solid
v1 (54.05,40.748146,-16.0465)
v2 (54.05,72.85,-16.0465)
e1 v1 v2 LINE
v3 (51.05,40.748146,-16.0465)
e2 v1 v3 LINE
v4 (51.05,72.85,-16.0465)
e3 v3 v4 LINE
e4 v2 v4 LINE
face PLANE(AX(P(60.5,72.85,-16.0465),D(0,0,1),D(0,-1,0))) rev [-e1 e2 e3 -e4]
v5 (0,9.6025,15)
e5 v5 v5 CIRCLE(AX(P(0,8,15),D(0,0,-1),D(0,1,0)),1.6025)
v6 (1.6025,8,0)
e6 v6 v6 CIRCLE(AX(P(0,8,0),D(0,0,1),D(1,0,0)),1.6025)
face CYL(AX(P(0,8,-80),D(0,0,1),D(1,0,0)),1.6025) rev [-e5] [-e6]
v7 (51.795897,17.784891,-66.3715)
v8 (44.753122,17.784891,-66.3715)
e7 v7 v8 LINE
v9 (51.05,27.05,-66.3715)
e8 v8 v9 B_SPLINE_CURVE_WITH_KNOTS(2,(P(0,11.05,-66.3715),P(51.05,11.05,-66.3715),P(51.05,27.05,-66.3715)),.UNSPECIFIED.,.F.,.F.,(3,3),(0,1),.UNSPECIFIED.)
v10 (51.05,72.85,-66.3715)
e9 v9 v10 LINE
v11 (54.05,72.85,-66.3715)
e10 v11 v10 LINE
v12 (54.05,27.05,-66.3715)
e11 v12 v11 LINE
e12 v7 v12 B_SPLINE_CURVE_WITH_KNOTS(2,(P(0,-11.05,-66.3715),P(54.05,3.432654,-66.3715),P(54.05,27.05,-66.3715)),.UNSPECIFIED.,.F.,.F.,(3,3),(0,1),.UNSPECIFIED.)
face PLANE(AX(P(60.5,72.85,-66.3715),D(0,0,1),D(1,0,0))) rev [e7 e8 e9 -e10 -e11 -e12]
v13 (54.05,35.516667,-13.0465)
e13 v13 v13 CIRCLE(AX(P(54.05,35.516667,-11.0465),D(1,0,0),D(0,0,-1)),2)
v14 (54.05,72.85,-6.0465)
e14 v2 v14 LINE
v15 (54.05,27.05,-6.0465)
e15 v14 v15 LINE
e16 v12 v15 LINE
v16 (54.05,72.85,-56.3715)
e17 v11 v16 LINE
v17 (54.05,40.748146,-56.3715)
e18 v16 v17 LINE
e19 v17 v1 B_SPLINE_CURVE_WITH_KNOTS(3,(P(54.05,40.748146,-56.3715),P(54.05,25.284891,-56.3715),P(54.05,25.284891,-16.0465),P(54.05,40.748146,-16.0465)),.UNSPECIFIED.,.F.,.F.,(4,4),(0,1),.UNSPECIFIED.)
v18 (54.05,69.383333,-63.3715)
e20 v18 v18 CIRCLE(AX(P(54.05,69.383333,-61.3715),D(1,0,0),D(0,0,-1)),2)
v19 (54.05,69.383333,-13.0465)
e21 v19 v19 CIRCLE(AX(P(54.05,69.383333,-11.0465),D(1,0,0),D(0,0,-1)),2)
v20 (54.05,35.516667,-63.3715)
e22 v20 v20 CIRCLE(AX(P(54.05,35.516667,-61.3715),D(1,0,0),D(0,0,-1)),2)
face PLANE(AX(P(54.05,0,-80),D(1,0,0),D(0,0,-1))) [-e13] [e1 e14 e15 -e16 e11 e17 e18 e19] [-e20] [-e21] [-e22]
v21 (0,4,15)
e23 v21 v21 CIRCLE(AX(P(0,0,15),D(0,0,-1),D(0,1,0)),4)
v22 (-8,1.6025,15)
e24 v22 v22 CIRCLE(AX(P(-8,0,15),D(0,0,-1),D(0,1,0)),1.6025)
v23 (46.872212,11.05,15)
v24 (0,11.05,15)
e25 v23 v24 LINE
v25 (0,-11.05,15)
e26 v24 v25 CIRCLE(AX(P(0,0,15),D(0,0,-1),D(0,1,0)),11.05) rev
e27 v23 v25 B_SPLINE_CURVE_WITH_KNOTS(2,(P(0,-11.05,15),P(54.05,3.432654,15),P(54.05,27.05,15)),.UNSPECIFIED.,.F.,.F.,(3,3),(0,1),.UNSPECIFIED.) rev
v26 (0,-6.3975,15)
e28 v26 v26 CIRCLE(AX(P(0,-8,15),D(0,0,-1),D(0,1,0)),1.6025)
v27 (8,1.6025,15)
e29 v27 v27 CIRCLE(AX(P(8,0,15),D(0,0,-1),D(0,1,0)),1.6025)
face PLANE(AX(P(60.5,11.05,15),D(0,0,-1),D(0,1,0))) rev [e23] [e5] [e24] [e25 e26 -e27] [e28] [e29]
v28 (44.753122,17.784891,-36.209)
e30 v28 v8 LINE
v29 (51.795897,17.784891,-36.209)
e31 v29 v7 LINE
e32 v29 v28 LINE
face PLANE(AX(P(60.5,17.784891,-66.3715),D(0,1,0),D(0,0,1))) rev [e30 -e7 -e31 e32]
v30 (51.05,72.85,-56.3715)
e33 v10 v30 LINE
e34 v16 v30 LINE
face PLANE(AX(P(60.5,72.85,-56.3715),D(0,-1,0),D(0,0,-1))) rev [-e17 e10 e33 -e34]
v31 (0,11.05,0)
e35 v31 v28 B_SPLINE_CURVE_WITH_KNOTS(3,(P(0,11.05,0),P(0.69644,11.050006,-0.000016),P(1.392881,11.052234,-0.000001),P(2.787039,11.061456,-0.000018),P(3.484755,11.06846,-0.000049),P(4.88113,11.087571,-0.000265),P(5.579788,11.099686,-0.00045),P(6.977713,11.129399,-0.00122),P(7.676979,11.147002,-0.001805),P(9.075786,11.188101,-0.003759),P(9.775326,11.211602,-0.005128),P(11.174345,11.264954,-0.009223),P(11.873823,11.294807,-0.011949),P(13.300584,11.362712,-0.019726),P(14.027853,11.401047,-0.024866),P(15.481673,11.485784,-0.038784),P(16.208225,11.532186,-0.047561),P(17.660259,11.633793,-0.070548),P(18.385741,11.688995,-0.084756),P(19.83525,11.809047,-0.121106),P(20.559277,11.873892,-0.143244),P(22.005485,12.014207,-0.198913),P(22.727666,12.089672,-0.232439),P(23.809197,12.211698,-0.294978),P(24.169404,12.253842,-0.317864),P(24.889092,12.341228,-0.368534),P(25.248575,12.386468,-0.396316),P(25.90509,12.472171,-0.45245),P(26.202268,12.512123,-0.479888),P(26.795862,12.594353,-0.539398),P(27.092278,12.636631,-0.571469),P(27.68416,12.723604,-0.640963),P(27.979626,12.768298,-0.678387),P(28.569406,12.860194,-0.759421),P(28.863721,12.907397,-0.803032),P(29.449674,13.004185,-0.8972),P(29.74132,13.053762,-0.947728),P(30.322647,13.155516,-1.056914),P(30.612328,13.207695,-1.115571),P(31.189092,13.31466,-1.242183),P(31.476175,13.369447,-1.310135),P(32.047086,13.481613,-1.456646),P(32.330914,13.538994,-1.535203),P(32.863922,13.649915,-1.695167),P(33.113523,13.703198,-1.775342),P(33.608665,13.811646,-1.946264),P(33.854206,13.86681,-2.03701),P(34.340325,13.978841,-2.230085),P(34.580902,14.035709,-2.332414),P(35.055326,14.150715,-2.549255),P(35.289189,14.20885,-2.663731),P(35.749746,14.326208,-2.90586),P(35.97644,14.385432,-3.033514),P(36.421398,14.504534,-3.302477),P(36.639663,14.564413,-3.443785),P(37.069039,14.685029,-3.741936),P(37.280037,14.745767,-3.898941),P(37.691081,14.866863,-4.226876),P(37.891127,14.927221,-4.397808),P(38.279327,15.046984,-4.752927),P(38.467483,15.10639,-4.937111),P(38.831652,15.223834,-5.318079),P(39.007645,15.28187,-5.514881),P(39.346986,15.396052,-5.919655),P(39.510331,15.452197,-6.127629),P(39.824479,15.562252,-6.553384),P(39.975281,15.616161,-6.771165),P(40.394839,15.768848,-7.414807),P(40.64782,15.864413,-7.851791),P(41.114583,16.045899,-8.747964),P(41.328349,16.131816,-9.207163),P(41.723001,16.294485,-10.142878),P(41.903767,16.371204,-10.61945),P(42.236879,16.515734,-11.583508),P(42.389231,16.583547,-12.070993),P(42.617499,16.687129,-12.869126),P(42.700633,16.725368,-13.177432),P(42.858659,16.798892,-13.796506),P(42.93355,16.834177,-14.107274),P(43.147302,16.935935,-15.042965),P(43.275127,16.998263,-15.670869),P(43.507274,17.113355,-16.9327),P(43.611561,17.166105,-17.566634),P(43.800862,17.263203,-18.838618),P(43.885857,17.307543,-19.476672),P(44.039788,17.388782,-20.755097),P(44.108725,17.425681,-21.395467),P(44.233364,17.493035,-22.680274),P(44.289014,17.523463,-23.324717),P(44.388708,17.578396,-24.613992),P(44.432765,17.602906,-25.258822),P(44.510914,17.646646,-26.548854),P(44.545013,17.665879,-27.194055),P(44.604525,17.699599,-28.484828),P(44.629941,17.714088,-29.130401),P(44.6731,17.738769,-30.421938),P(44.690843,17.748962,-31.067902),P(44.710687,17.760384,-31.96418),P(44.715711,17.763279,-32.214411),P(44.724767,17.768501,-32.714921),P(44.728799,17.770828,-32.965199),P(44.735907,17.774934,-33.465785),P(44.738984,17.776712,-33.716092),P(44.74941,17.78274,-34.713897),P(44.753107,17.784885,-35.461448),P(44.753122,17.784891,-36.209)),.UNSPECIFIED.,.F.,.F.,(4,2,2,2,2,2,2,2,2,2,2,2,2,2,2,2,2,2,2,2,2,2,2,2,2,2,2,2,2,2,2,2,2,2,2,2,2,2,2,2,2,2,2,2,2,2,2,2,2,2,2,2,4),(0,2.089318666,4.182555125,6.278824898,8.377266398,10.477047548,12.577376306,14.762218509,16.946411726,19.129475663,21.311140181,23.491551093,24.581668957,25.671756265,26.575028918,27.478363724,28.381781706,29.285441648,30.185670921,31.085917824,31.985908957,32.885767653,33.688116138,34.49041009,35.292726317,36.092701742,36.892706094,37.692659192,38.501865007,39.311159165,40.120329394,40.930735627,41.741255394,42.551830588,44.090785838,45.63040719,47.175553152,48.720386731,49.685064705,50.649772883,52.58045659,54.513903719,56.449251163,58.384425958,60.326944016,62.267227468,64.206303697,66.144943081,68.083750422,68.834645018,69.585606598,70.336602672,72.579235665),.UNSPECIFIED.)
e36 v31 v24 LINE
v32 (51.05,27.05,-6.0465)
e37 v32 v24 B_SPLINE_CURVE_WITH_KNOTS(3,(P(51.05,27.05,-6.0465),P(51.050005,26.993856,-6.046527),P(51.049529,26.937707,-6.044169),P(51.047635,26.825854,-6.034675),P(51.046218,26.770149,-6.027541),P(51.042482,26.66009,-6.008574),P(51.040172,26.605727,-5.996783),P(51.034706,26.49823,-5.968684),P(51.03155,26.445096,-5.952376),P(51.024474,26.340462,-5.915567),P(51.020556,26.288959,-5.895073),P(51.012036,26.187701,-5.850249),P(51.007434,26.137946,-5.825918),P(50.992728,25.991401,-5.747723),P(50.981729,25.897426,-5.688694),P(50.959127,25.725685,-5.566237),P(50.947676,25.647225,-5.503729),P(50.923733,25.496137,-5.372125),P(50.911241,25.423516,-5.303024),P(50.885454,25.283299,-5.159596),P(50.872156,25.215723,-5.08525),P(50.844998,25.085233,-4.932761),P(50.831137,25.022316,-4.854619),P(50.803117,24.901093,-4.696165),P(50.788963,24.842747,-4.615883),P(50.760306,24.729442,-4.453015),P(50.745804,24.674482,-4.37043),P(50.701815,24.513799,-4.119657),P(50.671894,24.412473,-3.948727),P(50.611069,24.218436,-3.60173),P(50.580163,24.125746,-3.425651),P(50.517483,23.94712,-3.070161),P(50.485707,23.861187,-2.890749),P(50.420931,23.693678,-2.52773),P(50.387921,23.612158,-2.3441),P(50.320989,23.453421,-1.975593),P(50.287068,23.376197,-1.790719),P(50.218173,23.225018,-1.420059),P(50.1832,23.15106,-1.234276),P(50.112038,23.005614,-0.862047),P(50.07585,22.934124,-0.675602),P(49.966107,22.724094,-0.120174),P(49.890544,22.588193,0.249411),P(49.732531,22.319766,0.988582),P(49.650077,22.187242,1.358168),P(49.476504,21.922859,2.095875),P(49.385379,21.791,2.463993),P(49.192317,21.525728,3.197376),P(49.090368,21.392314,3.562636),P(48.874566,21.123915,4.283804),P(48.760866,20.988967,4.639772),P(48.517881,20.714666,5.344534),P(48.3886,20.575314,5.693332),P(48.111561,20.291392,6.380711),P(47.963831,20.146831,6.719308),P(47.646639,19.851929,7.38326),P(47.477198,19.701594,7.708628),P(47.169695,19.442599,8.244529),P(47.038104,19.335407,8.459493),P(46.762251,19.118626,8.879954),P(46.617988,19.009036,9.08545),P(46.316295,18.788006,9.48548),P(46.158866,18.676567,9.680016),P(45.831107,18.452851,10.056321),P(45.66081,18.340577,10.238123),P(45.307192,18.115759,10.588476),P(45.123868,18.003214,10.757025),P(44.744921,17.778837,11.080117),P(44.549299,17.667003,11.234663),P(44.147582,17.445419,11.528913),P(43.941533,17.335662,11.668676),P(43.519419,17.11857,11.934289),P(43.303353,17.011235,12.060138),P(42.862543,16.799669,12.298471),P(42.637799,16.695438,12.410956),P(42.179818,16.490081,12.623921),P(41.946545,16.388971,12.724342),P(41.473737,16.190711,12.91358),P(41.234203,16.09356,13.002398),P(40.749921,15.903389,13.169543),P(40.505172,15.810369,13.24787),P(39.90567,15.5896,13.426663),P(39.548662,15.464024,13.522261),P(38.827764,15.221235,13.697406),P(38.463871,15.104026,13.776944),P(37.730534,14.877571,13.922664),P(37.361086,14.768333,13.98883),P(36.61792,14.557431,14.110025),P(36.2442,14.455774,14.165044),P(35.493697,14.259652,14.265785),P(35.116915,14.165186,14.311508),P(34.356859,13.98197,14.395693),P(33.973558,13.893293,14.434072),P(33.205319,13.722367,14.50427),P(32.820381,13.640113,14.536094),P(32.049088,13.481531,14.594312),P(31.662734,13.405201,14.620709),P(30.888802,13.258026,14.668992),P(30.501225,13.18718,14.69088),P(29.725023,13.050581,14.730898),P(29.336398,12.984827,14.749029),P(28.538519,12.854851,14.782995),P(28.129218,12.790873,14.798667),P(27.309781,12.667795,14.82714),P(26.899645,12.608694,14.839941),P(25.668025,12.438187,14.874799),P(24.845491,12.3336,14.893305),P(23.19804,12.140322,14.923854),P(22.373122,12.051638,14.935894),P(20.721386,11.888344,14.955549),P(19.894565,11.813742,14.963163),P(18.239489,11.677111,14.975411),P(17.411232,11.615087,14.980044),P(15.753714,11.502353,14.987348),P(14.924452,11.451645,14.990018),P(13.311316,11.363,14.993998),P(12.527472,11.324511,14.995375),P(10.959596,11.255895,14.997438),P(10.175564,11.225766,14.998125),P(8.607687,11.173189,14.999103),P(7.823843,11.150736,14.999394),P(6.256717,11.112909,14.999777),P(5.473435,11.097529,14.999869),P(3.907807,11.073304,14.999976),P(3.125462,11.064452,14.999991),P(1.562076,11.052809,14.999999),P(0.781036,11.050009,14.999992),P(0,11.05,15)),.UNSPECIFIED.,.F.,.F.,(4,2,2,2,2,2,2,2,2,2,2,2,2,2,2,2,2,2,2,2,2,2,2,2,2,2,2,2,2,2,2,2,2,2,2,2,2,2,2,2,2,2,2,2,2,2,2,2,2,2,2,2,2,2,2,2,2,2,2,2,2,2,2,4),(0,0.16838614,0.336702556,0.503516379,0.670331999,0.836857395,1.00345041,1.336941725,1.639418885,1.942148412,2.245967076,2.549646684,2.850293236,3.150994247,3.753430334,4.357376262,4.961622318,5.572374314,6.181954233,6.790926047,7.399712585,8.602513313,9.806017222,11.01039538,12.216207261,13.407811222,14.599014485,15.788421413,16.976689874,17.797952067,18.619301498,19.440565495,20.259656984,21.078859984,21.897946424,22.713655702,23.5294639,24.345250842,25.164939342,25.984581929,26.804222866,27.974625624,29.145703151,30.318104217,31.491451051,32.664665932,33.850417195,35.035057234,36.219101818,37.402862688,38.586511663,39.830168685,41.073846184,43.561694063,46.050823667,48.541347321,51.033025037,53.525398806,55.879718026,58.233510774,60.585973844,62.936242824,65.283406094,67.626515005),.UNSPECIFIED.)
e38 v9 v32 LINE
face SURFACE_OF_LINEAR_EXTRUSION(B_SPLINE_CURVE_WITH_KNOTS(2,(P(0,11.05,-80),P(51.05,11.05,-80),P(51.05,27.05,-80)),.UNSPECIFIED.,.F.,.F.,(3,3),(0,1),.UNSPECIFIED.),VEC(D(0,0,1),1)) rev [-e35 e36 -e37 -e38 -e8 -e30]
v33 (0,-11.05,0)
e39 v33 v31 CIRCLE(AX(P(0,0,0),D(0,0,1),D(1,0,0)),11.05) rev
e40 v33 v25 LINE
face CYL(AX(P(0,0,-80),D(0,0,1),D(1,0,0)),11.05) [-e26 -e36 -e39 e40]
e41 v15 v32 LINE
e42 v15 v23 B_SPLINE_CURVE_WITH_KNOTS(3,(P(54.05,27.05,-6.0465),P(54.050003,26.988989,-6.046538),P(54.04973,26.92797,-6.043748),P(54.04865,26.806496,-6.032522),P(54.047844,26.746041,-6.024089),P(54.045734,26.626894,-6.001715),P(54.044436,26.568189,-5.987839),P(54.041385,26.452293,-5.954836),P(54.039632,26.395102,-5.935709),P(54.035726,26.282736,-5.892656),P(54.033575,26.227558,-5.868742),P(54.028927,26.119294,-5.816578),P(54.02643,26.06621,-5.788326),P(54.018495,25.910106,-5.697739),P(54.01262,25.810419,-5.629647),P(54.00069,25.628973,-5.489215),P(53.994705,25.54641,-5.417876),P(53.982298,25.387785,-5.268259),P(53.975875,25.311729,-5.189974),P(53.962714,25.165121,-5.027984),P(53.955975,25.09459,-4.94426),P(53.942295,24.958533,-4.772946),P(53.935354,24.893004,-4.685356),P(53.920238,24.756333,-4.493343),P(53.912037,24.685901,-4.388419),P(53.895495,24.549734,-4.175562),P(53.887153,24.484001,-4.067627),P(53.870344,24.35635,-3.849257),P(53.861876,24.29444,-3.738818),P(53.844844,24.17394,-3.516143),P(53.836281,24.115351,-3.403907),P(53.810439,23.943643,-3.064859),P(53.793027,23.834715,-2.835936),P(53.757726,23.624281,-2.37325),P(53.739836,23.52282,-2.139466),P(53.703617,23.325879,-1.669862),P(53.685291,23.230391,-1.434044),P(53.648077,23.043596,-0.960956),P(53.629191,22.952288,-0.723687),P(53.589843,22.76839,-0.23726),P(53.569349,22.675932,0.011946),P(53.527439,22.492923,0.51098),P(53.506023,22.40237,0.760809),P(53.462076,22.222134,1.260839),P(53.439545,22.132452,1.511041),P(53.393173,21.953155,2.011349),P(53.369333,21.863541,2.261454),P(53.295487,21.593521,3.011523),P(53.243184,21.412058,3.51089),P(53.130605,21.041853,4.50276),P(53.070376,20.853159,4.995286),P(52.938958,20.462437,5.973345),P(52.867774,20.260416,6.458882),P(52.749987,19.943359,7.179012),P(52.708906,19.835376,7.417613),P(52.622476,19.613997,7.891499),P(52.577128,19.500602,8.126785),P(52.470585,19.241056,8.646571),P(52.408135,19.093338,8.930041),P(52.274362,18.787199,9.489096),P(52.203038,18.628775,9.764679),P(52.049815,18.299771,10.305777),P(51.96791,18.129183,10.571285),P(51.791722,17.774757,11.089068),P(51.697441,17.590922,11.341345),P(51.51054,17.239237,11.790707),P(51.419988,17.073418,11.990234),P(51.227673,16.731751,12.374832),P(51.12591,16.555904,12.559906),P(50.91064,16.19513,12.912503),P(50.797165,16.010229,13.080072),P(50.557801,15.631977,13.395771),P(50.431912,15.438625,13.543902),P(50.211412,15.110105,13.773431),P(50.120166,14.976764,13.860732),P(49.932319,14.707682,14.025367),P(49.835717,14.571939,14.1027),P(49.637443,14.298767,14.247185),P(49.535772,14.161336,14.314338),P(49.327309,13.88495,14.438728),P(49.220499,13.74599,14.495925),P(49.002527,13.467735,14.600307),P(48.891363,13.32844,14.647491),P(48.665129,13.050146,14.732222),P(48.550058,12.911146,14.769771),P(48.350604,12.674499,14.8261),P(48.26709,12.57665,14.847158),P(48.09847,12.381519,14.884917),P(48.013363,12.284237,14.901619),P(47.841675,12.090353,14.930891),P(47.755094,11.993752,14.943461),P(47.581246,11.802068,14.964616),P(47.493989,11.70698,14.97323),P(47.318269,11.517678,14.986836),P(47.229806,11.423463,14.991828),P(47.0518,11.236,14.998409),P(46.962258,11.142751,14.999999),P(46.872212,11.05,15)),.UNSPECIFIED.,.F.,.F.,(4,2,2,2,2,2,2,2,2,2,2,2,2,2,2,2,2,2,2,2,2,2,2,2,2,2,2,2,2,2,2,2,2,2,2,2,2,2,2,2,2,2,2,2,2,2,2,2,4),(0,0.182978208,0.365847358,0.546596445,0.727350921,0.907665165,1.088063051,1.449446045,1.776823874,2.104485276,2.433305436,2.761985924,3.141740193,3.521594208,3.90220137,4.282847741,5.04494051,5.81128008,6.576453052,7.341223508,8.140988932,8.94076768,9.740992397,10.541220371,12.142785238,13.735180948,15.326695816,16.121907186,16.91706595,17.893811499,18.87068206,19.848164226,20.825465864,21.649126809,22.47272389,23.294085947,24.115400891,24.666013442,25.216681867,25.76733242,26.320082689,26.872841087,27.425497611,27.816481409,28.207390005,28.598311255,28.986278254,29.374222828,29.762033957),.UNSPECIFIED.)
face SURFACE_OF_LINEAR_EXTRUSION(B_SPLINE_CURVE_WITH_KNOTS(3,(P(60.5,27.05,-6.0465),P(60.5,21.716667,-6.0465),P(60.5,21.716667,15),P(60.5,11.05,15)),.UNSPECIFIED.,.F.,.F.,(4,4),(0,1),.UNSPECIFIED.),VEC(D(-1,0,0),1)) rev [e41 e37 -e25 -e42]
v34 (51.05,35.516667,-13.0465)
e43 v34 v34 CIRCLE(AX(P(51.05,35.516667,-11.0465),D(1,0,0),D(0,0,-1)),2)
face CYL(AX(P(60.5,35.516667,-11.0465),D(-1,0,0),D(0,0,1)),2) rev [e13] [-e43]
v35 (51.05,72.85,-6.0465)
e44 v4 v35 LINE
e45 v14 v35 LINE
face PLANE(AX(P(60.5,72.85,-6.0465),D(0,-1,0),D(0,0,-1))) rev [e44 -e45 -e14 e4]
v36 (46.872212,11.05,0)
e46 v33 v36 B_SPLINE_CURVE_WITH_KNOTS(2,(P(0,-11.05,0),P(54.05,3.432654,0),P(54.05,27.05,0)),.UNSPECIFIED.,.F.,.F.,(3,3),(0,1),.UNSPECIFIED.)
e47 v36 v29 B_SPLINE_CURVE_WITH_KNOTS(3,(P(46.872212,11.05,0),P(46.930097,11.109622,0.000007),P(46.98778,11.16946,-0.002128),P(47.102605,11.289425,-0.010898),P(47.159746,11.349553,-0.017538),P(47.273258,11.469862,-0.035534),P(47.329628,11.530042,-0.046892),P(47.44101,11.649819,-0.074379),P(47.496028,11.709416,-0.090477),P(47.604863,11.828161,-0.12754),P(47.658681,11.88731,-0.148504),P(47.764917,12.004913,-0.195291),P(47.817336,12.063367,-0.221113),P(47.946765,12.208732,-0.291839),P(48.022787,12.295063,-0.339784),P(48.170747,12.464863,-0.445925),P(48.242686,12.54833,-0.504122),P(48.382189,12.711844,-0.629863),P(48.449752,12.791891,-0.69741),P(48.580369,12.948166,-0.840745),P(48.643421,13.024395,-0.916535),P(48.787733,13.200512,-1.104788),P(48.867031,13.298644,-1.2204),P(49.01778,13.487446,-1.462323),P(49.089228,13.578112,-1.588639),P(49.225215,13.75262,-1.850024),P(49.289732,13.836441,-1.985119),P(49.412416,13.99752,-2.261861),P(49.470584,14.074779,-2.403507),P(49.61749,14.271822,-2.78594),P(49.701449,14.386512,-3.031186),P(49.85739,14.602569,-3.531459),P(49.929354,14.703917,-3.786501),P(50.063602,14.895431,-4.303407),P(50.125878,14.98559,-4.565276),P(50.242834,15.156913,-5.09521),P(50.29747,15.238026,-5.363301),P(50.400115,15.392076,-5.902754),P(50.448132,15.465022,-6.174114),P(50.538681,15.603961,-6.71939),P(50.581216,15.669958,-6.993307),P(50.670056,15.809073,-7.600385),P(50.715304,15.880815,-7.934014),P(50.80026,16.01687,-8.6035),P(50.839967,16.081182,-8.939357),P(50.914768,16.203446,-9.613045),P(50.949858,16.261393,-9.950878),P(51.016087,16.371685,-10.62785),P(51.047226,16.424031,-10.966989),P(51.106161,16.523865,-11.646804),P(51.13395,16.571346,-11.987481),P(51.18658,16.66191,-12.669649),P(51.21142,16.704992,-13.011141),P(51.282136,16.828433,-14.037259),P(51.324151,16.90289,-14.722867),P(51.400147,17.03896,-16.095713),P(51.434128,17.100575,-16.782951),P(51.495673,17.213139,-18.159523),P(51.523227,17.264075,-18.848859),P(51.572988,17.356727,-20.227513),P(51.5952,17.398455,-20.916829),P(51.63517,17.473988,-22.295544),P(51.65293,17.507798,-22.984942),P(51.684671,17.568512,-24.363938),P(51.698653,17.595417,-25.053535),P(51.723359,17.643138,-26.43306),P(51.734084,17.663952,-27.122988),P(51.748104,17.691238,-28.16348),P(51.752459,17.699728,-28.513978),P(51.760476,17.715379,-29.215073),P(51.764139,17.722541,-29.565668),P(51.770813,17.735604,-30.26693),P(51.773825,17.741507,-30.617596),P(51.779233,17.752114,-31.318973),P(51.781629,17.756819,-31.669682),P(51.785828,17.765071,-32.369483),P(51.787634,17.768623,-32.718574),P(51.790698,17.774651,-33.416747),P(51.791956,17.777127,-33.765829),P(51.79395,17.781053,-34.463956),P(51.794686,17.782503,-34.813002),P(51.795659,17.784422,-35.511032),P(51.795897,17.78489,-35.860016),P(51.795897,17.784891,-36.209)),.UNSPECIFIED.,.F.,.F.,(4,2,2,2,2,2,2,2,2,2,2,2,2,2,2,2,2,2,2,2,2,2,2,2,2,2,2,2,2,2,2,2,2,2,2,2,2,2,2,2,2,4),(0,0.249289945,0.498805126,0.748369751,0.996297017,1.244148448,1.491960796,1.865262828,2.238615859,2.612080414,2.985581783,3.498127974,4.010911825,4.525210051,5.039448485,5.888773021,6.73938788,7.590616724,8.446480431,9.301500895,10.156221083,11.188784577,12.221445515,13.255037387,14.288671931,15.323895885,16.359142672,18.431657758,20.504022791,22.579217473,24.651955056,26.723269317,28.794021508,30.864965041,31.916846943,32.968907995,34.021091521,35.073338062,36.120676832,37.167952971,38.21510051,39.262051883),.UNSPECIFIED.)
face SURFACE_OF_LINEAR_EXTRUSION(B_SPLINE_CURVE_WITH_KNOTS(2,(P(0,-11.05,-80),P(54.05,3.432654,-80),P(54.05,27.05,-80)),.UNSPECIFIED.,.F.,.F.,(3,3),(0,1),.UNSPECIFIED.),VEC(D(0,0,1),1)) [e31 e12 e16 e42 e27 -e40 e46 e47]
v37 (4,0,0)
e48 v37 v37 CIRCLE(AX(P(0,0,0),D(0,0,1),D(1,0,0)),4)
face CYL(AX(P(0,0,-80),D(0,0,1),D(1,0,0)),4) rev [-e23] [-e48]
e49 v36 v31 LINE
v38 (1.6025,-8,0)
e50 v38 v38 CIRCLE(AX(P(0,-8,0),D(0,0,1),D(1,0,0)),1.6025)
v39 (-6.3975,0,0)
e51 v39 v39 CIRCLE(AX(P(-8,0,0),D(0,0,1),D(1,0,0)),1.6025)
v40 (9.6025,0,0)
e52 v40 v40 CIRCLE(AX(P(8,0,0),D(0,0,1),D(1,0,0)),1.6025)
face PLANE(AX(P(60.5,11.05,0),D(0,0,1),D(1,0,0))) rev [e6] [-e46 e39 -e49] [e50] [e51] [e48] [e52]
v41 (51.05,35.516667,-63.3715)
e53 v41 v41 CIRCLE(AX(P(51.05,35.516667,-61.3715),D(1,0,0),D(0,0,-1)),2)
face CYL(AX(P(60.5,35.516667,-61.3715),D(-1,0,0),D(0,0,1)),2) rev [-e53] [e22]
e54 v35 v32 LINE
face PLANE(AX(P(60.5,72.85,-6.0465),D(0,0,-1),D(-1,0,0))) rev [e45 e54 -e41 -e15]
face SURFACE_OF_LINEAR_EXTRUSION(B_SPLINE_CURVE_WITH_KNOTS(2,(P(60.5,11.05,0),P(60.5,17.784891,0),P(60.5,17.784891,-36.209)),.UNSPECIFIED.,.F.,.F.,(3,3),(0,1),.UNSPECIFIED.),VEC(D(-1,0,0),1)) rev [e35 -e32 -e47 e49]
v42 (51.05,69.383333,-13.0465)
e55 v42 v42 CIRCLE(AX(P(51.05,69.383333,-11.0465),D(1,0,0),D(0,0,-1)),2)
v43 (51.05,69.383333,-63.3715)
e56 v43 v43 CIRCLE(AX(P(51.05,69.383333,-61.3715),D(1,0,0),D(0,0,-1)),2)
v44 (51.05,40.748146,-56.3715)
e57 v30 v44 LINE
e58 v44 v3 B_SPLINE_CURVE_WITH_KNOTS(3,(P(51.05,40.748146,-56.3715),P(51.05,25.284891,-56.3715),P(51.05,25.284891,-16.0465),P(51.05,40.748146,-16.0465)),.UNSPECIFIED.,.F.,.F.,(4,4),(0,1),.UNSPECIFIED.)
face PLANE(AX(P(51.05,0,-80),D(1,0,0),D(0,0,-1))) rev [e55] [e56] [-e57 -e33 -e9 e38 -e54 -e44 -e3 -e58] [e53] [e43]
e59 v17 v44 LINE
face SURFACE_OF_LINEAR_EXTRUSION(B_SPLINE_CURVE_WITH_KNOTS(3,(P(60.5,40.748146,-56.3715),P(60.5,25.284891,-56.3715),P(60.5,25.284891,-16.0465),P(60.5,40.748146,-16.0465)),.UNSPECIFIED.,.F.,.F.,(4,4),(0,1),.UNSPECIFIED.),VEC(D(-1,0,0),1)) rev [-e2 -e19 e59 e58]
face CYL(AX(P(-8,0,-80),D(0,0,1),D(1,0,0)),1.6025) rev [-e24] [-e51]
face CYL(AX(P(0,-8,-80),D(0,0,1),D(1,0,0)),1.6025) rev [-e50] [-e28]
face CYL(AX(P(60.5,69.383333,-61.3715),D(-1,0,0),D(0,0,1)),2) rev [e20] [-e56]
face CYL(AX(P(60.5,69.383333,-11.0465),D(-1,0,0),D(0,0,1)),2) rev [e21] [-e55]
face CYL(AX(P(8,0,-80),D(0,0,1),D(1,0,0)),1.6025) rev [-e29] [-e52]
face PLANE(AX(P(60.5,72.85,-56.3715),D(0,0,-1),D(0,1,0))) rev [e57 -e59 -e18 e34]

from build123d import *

# Parameters (mm, degrees)
BOSS_EXTRUDE1_START     = -60.5
BOSS_EXTRUDE1_OUTLINE_R = 2
BOSS_EXTRUDE1_DEPTH     = 121
SKETCH1_W               = 179.187175662
SKETCH1_H               = 206.234296517
SKETCH1_R               = 1.6025
SKETCH1_R_2             = 4
CUT_EXTRUDE1_DEPTH      = 80


# Read off the part's stored shape, not the designer's step: Boss-Extrude1
with BuildPart() as part:
    # Boss-Extrude1 outline → Boss-Extrude1 (new body)
    with BuildSketch(Plane(origin=(0, 0, 0), x_dir=(0, 0, -1), z_dir=(1, 0, 0)).offset(BOSS_EXTRUDE1_START)):
        with BuildLine():
            Line((6.0465, 72.85), (6.0465, 27.05))
            add(Edge.make_bspline(
                [(6.0465, 27.05), (6.0465, 21.716666667), (-15, 21.716666667), (-15, 11.05)],
                knots=[0, 0, 0, 0, 1, 1, 1, 1], degree=3))
            Line((-15, 11.05), (-15, -11.05))
            Line((-15, -11.05), (0, -11.05))
            Line((0, -11.05), (0, 11.05))
            add(Edge.make_bspline(
                [(0, 11.05), (0, 17.784890874), (36.209, 17.784890874)],
                knots=[0, 0, 0, 1, 1, 1], degree=2))
            Line((36.209, 17.784890874), (66.3715, 17.784890874))
            Line((66.3715, 17.784890874), (66.3715, 72.85))
            Line((66.3715, 72.85), (56.3715, 72.85))
            Line((56.3715, 72.85), (56.3715, 40.748146134))
            add(Edge.make_bspline(
                [(56.3715, 40.748146134), (56.3715, 25.284890874), (16.0465, 25.284890874), (16.0465, 40.748146134)],
                knots=[0, 0, 0, 0, 1, 1, 1, 1], degree=3))
            Line((16.0465, 40.748146134), (16.0465, 72.85))
            Line((16.0465, 72.85), (6.0465, 72.85))
        make_face()
        with Locations((11.0465, 35.516666667)):
            Circle(BOSS_EXTRUDE1_OUTLINE_R, mode=Mode.SUBTRACT)
        with Locations((11.0465, 69.383333333)):
            Circle(BOSS_EXTRUDE1_OUTLINE_R, mode=Mode.SUBTRACT)
        with Locations((61.3715, 35.516666667)):
            Circle(BOSS_EXTRUDE1_OUTLINE_R, mode=Mode.SUBTRACT)
        with Locations((61.3715, 69.383333333)):
            Circle(BOSS_EXTRUDE1_OUTLINE_R, mode=Mode.SUBTRACT)
    extrude(amount=BOSS_EXTRUDE1_DEPTH)

    # Sketch1 → Cut-Extrude1 (cut, symmetric)
    # profile 1 of 6: a face of its own
    with BuildSketch(Plane.XY):
        with Locations((-22.097828966, 29.224383364)):
            Rectangle(SKETCH1_W, SKETCH1_H)
        with BuildLine():
            add(Edge.make_bspline(
                [(0, -11.05), (54.05, 3.432653851), (54.05, 27.05)],
                knots=[0, 0, 0, 1, 1, 1], degree=2))
            Line((54.05, 27.05), (54.05, 72.85))
            Line((54.05, 72.85), (51.05, 72.85))
            Line((51.05, 72.85), (51.05, 27.05))
            add(Edge.make_bspline(
                [(0, 11.05), (51.05, 11.05), (51.05, 27.05)],
                knots=[0, 0, 0, 1, 1, 1], degree=2))
            ThreePointArc((0, 11.05), (-11.05, 0), (0, -11.05))
        make_face(mode=Mode.SUBTRACT)
    # profile 2 of 6: a face of its own
    with BuildSketch(Plane.XY):
        with Locations((8, 0)):
            Circle(SKETCH1_R)
    # profile 3 of 6: a face of its own
    with BuildSketch(Plane.XY):
        with Locations((0, 8)):
            Circle(SKETCH1_R)
    # profile 4 of 6: a face of its own
    with BuildSketch(Plane.XY):
        with Locations((-8, 0)):
            Circle(SKETCH1_R)
    # profile 5 of 6: a face of its own
    with BuildSketch(Plane.XY):
        with Locations((0, -8)):
            Circle(SKETCH1_R)
    # profile 6 of 6: a face of its own
    with BuildSketch(Plane.XY):
        Circle(SKETCH1_R_2)
    extrude(amount=CUT_EXTRUDE1_DEPTH, both=True, mode=Mode.SUBTRACT)


solid = part.part
